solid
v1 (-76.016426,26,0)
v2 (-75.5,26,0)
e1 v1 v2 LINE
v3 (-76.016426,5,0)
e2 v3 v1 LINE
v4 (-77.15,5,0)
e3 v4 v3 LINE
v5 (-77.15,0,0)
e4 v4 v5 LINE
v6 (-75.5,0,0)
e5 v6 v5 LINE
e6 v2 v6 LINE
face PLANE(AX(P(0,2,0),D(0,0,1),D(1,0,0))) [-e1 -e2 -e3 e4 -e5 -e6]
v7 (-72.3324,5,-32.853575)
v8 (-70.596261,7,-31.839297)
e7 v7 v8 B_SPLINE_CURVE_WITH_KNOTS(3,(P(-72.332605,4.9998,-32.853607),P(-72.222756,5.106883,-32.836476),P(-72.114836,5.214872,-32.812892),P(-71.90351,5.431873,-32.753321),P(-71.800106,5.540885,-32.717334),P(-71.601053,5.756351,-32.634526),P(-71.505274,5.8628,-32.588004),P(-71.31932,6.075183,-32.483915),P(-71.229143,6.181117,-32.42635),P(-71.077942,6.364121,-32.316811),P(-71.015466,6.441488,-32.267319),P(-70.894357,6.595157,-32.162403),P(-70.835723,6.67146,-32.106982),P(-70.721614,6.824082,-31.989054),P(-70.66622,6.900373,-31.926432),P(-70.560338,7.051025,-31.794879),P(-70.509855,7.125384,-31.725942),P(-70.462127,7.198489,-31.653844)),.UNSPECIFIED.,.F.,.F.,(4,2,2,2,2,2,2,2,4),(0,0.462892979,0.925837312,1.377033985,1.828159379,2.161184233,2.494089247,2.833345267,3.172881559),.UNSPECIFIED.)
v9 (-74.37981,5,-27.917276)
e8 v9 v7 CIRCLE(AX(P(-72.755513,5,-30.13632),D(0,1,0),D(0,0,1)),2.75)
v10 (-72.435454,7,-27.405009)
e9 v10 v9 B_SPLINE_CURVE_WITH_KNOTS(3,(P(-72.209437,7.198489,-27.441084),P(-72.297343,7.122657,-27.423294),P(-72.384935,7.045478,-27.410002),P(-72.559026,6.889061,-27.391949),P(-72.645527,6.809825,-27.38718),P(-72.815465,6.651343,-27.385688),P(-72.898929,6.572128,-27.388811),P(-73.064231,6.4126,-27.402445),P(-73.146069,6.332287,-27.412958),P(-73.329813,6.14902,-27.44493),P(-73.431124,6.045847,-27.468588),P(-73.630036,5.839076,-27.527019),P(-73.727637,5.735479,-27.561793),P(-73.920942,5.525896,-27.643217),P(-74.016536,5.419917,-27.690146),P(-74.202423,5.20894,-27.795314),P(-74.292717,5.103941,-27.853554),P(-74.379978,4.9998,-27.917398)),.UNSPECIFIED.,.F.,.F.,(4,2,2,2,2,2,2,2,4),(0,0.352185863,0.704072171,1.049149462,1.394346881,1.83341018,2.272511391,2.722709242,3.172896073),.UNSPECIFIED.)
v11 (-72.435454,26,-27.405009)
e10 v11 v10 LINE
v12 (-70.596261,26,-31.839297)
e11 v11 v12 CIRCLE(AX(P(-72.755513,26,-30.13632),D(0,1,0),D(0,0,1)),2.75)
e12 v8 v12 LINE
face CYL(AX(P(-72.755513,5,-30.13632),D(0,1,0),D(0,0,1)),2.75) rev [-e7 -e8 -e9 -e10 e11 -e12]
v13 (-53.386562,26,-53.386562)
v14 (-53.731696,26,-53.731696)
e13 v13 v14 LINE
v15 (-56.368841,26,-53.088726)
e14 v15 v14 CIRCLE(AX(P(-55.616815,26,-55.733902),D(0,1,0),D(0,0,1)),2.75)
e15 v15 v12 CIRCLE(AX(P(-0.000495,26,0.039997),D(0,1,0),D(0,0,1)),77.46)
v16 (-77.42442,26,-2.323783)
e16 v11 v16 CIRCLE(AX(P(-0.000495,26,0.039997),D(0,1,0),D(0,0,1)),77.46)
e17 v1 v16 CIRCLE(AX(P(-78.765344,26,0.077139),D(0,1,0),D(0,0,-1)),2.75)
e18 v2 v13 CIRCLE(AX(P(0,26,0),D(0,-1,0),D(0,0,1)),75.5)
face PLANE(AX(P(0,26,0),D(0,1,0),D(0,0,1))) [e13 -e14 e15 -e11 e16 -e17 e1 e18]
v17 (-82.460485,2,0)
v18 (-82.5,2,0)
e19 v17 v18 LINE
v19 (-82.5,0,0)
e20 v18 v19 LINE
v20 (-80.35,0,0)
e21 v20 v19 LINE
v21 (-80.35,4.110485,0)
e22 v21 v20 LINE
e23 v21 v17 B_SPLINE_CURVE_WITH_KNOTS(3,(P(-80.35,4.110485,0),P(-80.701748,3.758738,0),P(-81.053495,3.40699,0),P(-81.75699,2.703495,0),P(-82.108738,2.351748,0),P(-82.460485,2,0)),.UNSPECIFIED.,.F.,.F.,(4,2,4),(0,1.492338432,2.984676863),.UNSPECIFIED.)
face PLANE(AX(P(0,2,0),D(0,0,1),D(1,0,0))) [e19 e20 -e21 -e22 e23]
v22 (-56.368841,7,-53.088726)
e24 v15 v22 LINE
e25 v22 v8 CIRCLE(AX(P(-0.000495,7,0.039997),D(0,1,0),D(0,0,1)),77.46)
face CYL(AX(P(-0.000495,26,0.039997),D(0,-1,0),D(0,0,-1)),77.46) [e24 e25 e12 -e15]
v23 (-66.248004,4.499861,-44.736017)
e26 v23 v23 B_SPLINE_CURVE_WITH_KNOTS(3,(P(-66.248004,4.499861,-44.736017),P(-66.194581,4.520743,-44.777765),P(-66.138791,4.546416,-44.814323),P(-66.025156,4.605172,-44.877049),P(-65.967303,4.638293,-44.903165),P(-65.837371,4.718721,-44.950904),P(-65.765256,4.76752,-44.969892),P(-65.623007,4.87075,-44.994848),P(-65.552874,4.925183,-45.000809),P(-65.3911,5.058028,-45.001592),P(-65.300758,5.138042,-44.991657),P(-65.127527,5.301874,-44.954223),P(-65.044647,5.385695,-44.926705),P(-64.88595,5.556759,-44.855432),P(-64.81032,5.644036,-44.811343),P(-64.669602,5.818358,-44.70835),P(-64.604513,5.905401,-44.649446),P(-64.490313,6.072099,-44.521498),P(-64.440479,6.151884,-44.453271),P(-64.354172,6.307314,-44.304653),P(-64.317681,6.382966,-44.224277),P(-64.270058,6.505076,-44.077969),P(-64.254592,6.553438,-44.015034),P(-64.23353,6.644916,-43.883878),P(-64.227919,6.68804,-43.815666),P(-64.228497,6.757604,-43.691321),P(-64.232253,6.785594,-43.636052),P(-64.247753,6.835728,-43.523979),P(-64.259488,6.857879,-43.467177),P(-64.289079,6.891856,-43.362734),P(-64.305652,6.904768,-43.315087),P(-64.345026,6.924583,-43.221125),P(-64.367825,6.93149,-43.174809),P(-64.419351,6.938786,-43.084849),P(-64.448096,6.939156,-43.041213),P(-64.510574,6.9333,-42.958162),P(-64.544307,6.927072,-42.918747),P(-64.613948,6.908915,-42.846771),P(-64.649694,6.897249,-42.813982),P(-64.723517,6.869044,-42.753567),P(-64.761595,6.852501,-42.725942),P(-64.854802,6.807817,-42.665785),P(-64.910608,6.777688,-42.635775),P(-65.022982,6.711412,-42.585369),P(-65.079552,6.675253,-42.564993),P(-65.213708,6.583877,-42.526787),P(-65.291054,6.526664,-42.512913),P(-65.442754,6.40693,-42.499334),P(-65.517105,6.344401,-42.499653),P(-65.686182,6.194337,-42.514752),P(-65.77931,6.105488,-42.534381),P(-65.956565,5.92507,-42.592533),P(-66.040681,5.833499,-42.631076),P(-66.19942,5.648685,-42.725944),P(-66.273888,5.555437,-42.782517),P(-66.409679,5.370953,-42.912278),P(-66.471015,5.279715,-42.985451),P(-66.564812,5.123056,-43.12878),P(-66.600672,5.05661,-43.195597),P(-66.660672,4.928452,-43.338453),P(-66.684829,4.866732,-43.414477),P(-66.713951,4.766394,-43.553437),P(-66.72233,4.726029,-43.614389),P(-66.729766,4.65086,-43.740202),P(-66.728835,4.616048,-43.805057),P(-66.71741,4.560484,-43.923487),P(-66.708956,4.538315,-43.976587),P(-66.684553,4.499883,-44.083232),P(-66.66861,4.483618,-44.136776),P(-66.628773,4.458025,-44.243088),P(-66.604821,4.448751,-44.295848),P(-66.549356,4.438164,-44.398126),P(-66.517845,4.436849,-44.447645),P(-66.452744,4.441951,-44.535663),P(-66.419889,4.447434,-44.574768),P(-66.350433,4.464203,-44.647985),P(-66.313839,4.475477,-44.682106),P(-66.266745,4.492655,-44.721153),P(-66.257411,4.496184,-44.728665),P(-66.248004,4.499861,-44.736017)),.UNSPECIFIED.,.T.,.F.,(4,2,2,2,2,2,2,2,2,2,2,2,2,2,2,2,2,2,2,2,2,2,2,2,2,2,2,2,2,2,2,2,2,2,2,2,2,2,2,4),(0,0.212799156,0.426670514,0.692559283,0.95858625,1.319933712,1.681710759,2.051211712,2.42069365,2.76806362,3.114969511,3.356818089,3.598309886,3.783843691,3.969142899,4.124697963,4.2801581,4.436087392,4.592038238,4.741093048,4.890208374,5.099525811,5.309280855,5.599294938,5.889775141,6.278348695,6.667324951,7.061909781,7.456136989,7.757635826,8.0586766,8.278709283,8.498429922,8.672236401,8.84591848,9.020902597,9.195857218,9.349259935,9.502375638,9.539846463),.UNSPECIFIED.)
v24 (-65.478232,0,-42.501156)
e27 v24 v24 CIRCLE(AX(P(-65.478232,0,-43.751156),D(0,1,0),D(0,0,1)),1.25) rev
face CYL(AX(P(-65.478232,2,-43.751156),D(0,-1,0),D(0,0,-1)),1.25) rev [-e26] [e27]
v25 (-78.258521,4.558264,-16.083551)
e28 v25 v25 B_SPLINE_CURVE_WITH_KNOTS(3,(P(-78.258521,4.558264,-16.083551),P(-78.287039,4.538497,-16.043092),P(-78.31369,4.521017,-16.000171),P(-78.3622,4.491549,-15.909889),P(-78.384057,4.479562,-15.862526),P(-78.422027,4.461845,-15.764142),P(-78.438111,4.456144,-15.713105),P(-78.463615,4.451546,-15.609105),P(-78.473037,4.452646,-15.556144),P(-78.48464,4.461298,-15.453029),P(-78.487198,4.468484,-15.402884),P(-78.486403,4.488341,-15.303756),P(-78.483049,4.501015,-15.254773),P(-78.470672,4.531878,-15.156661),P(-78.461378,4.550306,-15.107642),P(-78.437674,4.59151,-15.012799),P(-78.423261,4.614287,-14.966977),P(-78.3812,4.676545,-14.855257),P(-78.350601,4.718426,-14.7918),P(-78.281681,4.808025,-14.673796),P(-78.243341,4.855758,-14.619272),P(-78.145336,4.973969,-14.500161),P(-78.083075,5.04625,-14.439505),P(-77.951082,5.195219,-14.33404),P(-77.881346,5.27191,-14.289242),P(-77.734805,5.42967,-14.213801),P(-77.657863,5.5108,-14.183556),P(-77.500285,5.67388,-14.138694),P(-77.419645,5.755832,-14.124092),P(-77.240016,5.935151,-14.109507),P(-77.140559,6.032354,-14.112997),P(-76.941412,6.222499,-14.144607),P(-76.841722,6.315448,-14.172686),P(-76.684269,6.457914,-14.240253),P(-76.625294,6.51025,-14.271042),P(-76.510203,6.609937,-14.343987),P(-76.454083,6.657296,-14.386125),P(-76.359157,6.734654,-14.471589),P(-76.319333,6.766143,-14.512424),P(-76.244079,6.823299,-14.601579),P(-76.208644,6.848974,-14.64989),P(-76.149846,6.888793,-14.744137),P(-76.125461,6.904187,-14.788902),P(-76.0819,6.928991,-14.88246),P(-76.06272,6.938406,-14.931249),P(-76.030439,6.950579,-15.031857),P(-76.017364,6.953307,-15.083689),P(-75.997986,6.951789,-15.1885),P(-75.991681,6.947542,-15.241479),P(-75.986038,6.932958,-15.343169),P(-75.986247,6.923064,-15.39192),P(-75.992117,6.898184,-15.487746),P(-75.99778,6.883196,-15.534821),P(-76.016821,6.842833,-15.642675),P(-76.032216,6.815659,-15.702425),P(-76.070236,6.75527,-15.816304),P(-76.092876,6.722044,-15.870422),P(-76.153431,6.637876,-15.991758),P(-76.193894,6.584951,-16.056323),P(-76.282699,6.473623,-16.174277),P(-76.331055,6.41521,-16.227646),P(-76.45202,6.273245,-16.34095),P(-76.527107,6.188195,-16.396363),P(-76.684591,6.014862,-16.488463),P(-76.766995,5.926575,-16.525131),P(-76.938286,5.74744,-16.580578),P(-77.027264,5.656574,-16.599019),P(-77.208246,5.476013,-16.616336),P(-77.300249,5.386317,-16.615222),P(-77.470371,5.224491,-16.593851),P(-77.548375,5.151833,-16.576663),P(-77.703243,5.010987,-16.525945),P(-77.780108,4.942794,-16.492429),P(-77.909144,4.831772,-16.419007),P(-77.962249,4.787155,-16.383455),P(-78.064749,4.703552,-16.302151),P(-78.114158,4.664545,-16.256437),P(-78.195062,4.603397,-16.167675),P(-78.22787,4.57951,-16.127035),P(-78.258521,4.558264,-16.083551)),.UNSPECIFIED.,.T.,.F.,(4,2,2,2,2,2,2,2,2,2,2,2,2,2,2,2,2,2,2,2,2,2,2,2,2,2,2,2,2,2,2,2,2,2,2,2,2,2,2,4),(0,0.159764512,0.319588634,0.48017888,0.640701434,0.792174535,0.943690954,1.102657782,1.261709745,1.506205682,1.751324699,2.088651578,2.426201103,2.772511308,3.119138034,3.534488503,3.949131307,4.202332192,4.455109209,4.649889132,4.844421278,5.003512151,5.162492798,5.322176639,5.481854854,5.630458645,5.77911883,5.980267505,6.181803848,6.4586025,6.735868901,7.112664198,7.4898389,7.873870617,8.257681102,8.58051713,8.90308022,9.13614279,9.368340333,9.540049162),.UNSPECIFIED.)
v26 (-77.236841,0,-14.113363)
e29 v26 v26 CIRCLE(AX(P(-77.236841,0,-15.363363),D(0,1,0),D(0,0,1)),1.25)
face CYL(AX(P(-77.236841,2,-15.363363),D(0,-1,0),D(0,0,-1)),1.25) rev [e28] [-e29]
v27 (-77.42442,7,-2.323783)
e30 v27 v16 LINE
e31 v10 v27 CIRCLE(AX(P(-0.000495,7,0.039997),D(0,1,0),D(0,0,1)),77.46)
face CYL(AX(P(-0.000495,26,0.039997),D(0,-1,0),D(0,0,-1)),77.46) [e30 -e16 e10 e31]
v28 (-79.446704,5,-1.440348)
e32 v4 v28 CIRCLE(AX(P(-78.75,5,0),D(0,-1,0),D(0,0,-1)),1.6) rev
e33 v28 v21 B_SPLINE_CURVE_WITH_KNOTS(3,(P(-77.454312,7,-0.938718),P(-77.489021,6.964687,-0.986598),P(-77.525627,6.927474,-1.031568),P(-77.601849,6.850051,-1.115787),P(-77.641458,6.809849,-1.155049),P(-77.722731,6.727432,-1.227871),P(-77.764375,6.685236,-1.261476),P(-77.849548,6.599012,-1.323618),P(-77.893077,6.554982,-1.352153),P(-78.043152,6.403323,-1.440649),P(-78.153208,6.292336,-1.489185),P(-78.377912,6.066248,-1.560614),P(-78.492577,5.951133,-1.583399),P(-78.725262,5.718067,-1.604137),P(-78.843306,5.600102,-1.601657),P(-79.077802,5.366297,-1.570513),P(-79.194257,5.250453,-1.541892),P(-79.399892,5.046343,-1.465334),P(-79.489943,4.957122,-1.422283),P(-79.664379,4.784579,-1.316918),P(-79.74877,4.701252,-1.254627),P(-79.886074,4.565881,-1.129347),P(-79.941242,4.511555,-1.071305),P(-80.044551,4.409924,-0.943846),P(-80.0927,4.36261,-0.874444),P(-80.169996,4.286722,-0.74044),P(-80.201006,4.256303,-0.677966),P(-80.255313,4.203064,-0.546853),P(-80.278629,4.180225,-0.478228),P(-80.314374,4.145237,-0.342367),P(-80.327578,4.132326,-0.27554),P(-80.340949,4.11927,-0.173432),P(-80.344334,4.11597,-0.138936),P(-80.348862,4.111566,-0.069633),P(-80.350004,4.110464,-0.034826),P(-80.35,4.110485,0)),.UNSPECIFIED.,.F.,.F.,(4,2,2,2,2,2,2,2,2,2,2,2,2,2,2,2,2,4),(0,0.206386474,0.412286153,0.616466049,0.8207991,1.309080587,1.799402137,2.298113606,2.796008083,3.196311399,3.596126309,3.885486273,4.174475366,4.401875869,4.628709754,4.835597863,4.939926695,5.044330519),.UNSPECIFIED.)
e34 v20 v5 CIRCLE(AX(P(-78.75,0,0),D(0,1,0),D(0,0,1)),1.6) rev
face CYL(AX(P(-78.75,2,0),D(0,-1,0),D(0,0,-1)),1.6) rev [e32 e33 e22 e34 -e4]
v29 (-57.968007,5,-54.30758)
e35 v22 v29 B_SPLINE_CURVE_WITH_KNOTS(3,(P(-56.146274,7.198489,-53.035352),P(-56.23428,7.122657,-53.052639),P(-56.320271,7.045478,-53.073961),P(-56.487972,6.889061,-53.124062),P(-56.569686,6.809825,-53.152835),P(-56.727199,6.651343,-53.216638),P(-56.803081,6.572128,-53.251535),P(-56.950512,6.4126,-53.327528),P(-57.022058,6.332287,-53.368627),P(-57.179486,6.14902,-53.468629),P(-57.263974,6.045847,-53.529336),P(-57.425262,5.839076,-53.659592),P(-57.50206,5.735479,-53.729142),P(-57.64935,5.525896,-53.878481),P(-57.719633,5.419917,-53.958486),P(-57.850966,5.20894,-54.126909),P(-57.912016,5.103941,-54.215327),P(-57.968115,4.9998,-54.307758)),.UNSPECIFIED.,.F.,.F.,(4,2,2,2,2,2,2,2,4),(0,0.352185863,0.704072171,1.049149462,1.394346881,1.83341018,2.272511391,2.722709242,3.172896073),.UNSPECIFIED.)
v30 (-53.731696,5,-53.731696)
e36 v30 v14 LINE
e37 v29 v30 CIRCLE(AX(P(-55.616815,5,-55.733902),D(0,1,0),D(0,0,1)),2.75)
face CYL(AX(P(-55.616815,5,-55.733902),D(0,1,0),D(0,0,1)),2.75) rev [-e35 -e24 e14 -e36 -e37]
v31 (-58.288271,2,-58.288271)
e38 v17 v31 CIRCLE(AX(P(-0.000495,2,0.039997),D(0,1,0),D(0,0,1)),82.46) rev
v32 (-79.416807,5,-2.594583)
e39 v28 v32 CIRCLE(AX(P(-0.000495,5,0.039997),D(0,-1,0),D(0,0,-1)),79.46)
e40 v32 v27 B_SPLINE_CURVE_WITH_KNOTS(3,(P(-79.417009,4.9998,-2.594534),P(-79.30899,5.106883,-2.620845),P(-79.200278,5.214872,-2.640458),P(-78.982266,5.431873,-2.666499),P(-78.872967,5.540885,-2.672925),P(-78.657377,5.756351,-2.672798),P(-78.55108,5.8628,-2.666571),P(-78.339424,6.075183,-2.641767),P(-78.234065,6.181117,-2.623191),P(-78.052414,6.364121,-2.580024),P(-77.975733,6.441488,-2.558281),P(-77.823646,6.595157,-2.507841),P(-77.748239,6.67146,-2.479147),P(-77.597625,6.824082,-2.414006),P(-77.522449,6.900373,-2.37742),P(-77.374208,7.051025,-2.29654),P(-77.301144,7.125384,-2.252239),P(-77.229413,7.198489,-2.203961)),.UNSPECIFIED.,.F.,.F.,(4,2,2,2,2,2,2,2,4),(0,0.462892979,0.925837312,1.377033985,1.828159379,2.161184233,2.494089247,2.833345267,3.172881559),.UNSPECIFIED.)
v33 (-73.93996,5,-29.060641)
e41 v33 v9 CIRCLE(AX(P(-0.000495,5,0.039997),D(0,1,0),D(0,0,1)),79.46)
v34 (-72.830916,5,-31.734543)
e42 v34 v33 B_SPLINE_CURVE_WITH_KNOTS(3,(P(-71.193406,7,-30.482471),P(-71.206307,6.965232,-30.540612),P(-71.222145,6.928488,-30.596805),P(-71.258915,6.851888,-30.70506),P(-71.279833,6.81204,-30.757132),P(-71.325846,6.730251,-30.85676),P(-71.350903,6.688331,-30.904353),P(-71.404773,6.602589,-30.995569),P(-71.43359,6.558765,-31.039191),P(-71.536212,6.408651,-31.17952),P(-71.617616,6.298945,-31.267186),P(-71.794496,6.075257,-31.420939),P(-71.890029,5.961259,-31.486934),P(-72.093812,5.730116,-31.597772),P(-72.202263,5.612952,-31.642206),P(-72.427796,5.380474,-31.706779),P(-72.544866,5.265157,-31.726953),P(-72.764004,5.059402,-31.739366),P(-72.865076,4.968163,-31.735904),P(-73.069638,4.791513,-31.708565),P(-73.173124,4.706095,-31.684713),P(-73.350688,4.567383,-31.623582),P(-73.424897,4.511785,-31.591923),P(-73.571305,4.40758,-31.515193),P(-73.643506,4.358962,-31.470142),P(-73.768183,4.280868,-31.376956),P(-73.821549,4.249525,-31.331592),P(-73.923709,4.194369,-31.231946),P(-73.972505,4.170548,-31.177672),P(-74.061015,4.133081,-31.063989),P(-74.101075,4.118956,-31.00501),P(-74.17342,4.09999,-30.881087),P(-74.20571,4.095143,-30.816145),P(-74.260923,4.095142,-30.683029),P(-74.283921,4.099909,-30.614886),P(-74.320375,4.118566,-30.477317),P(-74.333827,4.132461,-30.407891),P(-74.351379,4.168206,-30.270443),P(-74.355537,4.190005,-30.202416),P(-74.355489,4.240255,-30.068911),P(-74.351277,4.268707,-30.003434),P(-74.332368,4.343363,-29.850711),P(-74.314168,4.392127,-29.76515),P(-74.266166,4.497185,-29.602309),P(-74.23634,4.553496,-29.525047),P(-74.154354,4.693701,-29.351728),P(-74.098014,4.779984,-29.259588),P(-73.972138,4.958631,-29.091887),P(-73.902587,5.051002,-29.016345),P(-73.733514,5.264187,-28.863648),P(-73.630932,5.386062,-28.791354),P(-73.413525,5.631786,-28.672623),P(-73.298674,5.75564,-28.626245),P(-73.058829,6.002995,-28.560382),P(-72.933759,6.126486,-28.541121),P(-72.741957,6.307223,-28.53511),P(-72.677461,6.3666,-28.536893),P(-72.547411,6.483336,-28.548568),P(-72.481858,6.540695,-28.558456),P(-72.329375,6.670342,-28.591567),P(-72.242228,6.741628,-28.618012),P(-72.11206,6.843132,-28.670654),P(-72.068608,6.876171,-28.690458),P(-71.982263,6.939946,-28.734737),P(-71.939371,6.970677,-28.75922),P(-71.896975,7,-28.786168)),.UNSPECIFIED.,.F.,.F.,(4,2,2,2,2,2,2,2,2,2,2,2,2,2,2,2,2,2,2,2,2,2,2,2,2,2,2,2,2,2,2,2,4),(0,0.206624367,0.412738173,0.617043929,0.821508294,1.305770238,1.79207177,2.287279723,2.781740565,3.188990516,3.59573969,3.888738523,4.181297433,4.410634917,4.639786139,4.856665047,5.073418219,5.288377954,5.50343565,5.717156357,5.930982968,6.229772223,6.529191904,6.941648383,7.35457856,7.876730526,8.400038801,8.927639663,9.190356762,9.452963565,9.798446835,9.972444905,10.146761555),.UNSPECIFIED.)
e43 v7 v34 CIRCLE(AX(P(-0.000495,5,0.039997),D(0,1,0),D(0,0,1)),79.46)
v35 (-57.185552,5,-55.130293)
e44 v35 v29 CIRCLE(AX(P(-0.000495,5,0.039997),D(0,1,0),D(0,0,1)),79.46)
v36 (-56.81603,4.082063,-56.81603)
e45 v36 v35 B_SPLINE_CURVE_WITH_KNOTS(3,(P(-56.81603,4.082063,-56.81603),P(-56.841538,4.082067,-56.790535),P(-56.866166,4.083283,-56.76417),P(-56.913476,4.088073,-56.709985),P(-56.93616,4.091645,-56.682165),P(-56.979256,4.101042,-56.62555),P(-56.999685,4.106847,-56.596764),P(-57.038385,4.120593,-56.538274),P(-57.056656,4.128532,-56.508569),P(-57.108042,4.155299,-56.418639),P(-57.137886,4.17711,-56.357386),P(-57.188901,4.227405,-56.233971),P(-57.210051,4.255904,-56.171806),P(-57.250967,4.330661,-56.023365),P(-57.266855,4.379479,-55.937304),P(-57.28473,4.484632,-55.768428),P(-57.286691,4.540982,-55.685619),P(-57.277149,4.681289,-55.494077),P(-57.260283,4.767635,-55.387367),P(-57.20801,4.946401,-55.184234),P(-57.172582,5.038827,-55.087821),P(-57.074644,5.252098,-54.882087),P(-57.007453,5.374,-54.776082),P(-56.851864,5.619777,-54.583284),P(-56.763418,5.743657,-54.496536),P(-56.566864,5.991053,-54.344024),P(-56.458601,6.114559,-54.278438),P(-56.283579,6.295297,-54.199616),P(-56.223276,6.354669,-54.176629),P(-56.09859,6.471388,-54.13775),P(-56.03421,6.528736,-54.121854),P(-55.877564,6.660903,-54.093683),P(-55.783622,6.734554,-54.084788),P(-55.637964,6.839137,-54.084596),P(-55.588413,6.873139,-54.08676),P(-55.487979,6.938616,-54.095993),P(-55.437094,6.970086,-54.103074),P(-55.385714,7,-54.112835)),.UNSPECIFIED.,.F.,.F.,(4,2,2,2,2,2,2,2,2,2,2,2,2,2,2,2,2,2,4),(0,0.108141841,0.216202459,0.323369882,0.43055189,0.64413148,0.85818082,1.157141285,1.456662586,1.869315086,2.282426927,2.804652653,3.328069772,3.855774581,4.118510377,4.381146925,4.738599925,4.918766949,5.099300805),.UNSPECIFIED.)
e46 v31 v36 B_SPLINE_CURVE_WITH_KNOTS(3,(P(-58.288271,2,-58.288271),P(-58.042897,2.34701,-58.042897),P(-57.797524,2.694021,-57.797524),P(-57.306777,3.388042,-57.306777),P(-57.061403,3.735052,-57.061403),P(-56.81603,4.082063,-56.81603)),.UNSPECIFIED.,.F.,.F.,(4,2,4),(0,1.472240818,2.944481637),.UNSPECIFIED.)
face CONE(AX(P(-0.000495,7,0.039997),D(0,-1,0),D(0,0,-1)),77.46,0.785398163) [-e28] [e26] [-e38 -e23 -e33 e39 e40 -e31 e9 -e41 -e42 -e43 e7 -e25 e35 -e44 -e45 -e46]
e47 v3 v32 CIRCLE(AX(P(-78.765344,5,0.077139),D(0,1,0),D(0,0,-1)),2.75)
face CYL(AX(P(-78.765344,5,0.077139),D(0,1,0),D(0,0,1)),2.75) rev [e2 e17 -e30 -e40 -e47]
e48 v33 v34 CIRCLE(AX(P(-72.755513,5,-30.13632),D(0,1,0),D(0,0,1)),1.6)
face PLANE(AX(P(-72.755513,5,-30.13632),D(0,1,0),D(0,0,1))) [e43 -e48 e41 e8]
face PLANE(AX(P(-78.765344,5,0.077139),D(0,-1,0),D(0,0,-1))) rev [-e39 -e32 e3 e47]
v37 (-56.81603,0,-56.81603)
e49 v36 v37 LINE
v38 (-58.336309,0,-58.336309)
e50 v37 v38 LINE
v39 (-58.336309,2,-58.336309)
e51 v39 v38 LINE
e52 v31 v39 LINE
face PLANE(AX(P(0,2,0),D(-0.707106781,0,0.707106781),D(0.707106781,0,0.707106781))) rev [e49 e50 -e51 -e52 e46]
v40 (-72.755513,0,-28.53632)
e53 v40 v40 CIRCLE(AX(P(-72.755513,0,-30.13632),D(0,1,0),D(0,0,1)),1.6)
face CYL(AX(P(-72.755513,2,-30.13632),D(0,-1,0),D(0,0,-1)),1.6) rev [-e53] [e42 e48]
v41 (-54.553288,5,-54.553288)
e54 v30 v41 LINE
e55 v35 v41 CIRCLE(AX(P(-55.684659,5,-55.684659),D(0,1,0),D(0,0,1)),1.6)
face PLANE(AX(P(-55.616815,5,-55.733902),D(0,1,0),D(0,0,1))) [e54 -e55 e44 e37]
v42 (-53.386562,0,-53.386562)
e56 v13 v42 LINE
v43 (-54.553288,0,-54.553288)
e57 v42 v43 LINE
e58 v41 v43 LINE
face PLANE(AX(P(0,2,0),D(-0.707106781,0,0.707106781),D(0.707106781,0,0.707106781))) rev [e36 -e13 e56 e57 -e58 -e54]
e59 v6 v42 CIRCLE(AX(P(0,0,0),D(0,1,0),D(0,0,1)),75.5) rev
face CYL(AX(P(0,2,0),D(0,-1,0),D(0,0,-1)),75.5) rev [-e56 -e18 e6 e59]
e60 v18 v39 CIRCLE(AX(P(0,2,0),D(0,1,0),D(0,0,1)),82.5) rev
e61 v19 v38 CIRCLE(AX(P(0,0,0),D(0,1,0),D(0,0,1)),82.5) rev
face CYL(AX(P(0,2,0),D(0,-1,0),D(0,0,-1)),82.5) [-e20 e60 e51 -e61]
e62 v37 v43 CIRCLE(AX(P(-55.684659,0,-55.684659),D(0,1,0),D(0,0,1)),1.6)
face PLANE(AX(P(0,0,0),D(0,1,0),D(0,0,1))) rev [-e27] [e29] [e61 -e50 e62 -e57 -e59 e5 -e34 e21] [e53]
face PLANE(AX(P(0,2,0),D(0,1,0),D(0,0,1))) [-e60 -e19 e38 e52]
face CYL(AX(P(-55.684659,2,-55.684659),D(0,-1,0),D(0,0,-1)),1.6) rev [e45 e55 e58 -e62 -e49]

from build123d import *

# Parameters (mm, degrees)
SKETCH1_R           = 1.6
SKETCH1_R_2         = 1.25
BOSS_EXTRUDE1_DEPTH = 2
BOSS_EXTRUDE3_DEPTH = 24
CHAMFER2_SIZE       = 5
SKETCH3_R           = 2.75
CUT_EXTRUDE1_DEPTH  = 21


with BuildPart() as part:
    # Sketch1 → Boss-Extrude1 (new body)
    with BuildSketch(Plane(origin=(0, 0, 0), x_dir=(1, 0, 0), z_dir=(0, 1, 0))):
        with BuildLine():
            Line((-53.38656198, 53.38656198), (-54.553288169, 54.553288169))
            ThreePointArc((-54.553288169, 54.553288169), (-56.816029868, 54.553288169), (-56.816029868, 56.816029868))
            Line((-56.816029868, 56.816029868), (-58.336309448, 58.336309448))
            ThreePointArc((-58.336309448, 58.336309448), (-76.220061432, 31.57138317), (-82.5, 0))
            Line((-82.5, 0), (-80.35, 0))
            ThreePointArc((-80.35, 0), (-78.75, 1.6), (-77.15, 0))
            Line((-77.15, 0), (-75.5, 0))
            ThreePointArc((-75.5, 0), (-69.752904705, 28.892599144), (-53.38656198, 53.38656198))
        make_face()
        with Locations(Location((-72.755513185, 30.136320299, 0), (0, 0, 270))):
            Circle(SKETCH1_R, mode=Mode.SUBTRACT)
        with Locations(Location((-77.236840832, 15.363362859, 0), (0, 0, 270))):
            Circle(SKETCH1_R_2, mode=Mode.SUBTRACT)
        with Locations(Location((-65.478231969, 43.75115585, 0), (0, 0, 270))):
            Circle(SKETCH1_R_2, mode=Mode.SUBTRACT)
    extrude(amount=BOSS_EXTRUDE1_DEPTH)

    # Sketch2 → Boss-Extrude3 (add)
    with BuildSketch(Plane(origin=(0, 2, 0), x_dir=(1, 0, 0), z_dir=(0, 1, 0))):
        with BuildLine():
            Line((-75.5, 0), (-77.15, 0))
            ThreePointArc((-77.15, 0), (-77.22797812, 0.493405915), (-77.454311746, 0.938718248))
            ThreePointArc((-77.454311746, 0.938718248), (-77.086470316, 7.562898661), (-76.153142939, 14.131305885))
            ThreePointArc((-76.153142939, 14.131305885), (-74.455316583, 21.326592742), (-72.07927757, 28.327250276))
            ThreePointArc((-72.07927757, 28.327250276), (-71.988492028, 28.556854202), (-71.896975095, 28.786167586))
            ThreePointArc((-71.896975095, 28.786167586), (-71.277594826, 29.523329822), (-71.193405789, 30.482471253))
            ThreePointArc((-71.193405789, 30.482471253), (-68.314800527, 36.47311401), (-64.933244978, 42.194936357))
            ThreePointArc((-64.933244978, 42.194936357), (-60.45388582, 48.389737192), (-55.385713525, 54.112834731))
            ThreePointArc((-55.385713525, 54.112834731), (-54.936360269, 54.270428139), (-54.553288169, 54.553288169))
            Line((-54.553288169, 54.553288169), (-53.38656198, 53.38656198))
            ThreePointArc((-53.38656198, 53.38656198), (-69.752904705, 28.892599144), (-75.5, 0))
        make_face()
    extrude(amount=BOSS_EXTRUDE3_DEPTH)

    # Chamfer2
    # the kernel refuses this chamfer: 5 mm, written as the material it adds along each edge
    with BuildSketch(Plane(origin=(-0.000495077, 2, 0.039996936), x_dir=(-0.5896650558318113, 0, -0.8076478947727573), z_dir=(0.8076478947727573, 0, -0.5896650558318113))) as chamfer2_piece_1_section:
        Polygon((77.46 + CHAMFER2_SIZE, 0), (77.46, CHAMFER2_SIZE), (77.46, 0), align=None)
    chamfer2_piece_1 = revolve(axis=Axis((-0.000495077, 2, 0.039996936), (0, 1, 0)), revolution_arc=40.171888597, mode=Mode.PRIVATE)
    chamfer2_piece_1 = chamfer2_piece_1 - Plane(origin=(-65.478231969, 3.629075294, -43.75115585), x_dir=(0, 0, 1), z_dir=(0, -1, 0)) * Cylinder(1.25, 330, mode=Mode.PRIVATE)
    chamfer2_piece_1 = chamfer2_piece_1 - Plane(origin=(-72.755513185, 3.629075294, -30.136320299), x_dir=(0, 0, 1), z_dir=(0, -1, 0)) * Cylinder(1.6, 330, mode=Mode.PRIVATE)
    chamfer2_piece_1 = split(chamfer2_piece_1, bisect_by=Plane(origin=(-53.187185599, 3.629075294, -53.187185599), z_dir=(-0.7071067811865476, 0, 0.7071067811865476)), keep=Keep.TOP, mode=Mode.PRIVATE)
    chamfer2_piece_1 = chamfer2_piece_1 - Plane(origin=(-55.684659018, 3.629075294, -55.684659018), x_dir=(0.7071067811865365, 0, 0.7071067811865587), z_dir=(0, -1, 0)) * Cylinder(1.6, 330, mode=Mode.PRIVATE)
    add(chamfer2_piece_1)
    with BuildSketch(Plane(origin=(-0.000495079, 2, 0.039996936), x_dir=(-0.8539218863713415, 0, -0.52040120289639), z_dir=(0.52040120289639, 0, -0.8539218863713415))) as chamfer2_piece_2_section:
        Polygon((77.459999998 + CHAMFER2_SIZE, 0), (77.459999998, CHAMFER2_SIZE), (77.459999998, 0), align=None)
    chamfer2_piece_2 = revolve(axis=Axis((-0.000495079, 2, 0.039996936), (0, 1, 0)), revolution_arc=40.146560284, mode=Mode.PRIVATE)
    chamfer2_piece_2 = chamfer2_piece_2 - Plane(origin=(-77.236840832, 3.628431505, -15.363362859), x_dir=(0, 0, 1), z_dir=(0, -1, 0)) * Cylinder(1.25, 330, mode=Mode.PRIVATE)
    chamfer2_piece_2 = chamfer2_piece_2 - Plane(origin=(-72.755513185, 3.628431505, -30.136320299), x_dir=(0, 0, 1), z_dir=(0, -1, 0)) * Cylinder(1.6, 330, mode=Mode.PRIVATE)
    chamfer2_piece_2 = chamfer2_piece_2 - Plane(origin=(-78.75, 3.628431505, 0), x_dir=(-1, 0, 0), z_dir=(0, -1, 0)) * Cylinder(1.6, 330, mode=Mode.PRIVATE)
    chamfer2_piece_2 = split(chamfer2_piece_2, bisect_by=Plane(origin=(-75.22737359, 3.628431505, 0), z_dir=(0, 0, -1)), keep=Keep.TOP, mode=Mode.PRIVATE)
    add(chamfer2_piece_2)

    # Sketch3 → Cut-Extrude1 (cut)
    with BuildSketch(Plane(origin=(0, 26, 0), x_dir=(1, 0, 0), z_dir=(0, 1, 0))):
        with Locations((-72.755513185, 30.136320299)):
            Circle(SKETCH3_R)
        with Locations((-78.76534385, -0.077138745)):
            Circle(SKETCH3_R)
        with Locations((-55.616814575, 55.733901863)):
            Circle(SKETCH3_R)
    extrude(amount=-CUT_EXTRUDE1_DEPTH, mode=Mode.SUBTRACT)


solid = part.part
